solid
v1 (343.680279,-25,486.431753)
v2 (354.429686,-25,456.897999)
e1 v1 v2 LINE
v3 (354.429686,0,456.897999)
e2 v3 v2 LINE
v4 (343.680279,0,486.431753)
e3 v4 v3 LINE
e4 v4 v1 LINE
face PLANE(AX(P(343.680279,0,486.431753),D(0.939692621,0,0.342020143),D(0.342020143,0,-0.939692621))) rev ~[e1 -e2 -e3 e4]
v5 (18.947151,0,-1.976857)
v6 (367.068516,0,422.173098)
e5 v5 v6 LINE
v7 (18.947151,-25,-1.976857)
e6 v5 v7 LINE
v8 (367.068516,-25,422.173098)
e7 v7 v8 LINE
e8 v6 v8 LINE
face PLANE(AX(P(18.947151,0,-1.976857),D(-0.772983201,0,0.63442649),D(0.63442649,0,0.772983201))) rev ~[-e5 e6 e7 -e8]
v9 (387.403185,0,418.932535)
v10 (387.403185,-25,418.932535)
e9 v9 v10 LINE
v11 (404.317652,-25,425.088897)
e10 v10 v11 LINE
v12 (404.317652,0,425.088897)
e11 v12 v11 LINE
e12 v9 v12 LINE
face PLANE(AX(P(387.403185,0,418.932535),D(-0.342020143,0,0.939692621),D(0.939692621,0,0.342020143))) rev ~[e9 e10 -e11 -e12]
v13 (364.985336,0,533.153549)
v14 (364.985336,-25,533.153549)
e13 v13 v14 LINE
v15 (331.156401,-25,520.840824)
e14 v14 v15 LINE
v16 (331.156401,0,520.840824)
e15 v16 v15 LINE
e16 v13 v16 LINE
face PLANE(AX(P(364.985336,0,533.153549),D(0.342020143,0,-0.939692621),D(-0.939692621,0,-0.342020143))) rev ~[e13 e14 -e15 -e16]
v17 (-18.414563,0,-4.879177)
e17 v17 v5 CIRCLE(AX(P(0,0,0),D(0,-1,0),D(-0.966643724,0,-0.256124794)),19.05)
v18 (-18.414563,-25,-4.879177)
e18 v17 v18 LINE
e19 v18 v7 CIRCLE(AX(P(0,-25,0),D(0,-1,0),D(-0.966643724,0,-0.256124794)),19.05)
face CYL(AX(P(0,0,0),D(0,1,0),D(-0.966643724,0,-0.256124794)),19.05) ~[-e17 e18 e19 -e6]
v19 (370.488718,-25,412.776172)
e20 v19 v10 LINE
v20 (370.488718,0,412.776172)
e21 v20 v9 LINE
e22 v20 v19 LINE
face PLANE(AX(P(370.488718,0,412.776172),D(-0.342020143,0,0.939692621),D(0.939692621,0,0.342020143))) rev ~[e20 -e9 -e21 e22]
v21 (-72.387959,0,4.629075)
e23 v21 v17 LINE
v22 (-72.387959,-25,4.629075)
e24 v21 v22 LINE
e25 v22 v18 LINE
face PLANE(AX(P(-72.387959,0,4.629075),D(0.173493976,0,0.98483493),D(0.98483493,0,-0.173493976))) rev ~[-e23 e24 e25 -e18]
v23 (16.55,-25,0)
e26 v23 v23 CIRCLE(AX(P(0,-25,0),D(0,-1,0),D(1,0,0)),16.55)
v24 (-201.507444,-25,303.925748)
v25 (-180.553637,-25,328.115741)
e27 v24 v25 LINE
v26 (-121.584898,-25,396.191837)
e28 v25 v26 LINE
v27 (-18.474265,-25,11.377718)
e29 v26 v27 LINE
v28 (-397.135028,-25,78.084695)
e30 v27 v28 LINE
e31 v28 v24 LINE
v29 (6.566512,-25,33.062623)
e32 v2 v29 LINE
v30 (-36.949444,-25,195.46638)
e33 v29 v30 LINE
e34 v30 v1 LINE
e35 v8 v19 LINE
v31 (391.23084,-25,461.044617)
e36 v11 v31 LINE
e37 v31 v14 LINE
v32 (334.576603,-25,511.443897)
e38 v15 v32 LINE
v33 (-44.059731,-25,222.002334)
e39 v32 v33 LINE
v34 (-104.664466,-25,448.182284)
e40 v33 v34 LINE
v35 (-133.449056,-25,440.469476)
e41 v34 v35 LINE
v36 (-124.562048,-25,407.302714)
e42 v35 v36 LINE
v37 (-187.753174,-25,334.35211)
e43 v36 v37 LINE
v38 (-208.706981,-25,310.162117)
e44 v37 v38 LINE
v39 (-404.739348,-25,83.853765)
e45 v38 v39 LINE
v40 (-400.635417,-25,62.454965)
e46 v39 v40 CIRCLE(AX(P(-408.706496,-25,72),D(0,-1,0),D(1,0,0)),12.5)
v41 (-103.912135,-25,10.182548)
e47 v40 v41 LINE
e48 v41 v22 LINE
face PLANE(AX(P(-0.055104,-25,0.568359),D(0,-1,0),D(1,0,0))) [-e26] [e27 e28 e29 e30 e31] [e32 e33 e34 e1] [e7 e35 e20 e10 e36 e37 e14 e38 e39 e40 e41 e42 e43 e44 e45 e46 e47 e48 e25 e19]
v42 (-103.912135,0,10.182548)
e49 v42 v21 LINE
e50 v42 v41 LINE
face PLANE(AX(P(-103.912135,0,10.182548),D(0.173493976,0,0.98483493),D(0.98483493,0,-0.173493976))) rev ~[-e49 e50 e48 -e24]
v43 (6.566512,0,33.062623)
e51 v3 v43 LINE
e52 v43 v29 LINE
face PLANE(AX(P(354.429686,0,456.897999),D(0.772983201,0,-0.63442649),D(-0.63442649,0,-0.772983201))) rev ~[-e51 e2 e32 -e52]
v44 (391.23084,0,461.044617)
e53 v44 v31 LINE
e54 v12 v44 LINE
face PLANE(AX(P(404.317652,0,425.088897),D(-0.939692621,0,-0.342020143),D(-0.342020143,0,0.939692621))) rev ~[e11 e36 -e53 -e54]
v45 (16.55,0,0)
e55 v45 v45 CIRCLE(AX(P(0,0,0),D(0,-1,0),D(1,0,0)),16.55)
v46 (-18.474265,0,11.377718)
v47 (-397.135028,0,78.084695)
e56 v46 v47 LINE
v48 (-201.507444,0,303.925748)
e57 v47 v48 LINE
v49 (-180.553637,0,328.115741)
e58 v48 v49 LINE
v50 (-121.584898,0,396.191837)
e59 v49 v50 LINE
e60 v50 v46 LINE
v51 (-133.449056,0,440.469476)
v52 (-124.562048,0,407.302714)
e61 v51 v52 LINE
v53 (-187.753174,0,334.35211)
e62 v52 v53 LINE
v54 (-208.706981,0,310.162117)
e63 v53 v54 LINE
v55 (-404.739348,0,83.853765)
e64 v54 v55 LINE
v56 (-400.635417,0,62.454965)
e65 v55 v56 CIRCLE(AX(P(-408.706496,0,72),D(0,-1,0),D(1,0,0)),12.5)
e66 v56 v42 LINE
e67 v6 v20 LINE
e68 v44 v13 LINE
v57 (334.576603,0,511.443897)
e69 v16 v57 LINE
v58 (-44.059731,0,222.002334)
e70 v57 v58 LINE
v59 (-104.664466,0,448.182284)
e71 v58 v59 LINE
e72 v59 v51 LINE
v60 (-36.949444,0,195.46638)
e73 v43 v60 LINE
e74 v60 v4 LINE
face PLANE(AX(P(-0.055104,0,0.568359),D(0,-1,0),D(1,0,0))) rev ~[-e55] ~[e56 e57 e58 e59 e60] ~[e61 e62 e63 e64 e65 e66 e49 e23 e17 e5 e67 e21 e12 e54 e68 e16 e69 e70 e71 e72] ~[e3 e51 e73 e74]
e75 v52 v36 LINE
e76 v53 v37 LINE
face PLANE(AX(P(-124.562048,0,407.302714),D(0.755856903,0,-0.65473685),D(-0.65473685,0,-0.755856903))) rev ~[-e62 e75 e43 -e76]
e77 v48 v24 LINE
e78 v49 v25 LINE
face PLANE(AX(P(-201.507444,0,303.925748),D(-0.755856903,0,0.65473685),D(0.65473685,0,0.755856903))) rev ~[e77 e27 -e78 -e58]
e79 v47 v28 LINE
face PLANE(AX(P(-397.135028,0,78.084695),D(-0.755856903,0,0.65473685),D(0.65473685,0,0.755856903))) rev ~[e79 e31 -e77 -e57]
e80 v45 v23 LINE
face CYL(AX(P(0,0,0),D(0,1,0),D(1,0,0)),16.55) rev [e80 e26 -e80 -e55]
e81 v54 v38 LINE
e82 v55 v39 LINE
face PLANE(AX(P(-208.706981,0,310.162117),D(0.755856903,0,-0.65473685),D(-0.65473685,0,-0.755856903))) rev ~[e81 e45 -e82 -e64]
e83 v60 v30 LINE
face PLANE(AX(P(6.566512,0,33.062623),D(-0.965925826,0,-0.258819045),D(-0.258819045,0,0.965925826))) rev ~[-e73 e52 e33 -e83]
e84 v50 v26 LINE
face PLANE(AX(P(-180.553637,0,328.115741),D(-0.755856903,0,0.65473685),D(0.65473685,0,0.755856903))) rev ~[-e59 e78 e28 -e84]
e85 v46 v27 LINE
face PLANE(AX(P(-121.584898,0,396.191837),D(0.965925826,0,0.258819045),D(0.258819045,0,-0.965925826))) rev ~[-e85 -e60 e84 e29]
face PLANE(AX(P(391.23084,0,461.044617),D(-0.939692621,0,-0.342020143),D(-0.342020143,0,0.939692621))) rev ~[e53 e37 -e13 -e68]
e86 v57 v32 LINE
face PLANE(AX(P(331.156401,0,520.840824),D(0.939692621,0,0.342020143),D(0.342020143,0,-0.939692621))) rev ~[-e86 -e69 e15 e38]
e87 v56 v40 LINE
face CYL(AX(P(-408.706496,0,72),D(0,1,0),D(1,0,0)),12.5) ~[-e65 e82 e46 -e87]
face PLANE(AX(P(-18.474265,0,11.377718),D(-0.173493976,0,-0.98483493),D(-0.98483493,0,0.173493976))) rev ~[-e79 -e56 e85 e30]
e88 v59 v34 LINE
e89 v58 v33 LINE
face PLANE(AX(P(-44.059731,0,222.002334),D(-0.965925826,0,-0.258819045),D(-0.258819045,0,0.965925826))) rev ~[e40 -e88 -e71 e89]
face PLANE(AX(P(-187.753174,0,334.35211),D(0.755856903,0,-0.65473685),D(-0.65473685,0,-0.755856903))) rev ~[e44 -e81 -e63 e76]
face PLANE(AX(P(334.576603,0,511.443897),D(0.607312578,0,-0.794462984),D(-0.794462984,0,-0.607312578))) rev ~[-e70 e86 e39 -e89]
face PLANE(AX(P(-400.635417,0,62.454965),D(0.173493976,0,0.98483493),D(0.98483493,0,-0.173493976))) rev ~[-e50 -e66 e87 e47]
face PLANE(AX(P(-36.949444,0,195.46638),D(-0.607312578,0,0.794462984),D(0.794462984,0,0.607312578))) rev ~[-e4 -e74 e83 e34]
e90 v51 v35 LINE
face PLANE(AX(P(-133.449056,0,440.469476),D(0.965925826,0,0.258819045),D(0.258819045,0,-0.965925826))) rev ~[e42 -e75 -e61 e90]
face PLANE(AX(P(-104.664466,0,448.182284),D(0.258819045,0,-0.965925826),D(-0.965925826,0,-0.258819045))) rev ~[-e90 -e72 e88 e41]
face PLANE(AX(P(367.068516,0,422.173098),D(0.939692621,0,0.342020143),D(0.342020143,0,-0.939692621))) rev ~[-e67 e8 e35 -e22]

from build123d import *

# Parameters (mm, degrees)
F1_R     = 16.55
F0_DEPTH = 25


with BuildPart() as f0:
    # F1 (on Front) → F0 (new body)
    with BuildSketch(Plane.XZ):
        with BuildLine():
            ThreePointArc((18.9471511403, -1.9768570177), (19.0242704094, -0.9897653202), (19.05, 0))
            ThreePointArc((19.05, 0), (17.0081092666, 8.5806013294), (11.3201607165, 15.3217643028))
            ThreePointArc((11.3201607165, 15.3217643028), (3.1862146863, 18.7816542395), (-5.6337146577, 18.1979053508))
            ThreePointArc((-5.6337146577, 18.1979053508), (-12.7048225923, 14.1947167248), (-17.4644289069, 7.6089567588))
            ThreePointArc((-17.4644289069, 7.6089567588), (-18.9951016681, 1.4452033137), (-18.4145629505, -4.8791773224))
            ThreePointArc((-18.4145629505, -4.8791773224), (1.4753909085, -18.9927807776), (18.9471511403, -1.9768570177))
        make_face()
        Circle(F1_R, mode=Mode.SUBTRACT)
        with BuildLine():
            ThreePointArc((11.3201607165, 15.3217643028), (17.0081092666, 8.5806013294), (19.05, 0))
            ThreePointArc((19.05, 0), (19.0242704094, -0.9897653202), (18.9471511403, -1.9768570177))
            Line((18.9471511403, -1.9768570177), (367.068516355, 422.1730984288))
            Line((367.068516355, 422.1730984288), (358.5591705204, 445.5523339637))
            Line((358.5591705204, 445.5523339637), (354.4296862364, 456.8979987878))
            Line((354.4296862364, 456.8979987878), (197.6336692676, 265.8582343353))
            Line((197.6336692676, 265.8582343353), (68.718206586, 108.788047853))
            Line((68.718206586, 108.788047853), (6.5665120874, 33.0626225082))
            Line((6.5665120874, 33.0626225082), (11.3201607165, 15.3217643028))
        make_face()
        with BuildLine():
            ThreePointArc((-5.6337146577, 18.1979053508), (3.1862146863, 18.7816542395), (11.3201607165, 15.3217643028))
            Line((11.3201607165, 15.3217643028), (6.5665120874, 33.0626225082))
            Line((6.5665120874, 33.0626225082), (-36.9494436056, 195.4663800944))
            Line((-36.9494436056, 195.4663800944), (-44.0597309982, 222.0023338999))
            Line((-44.0597309982, 222.0023338999), (-104.6644659355, 448.182283865))
            Line((-104.6644659355, 448.182283865), (-133.4490555589, 440.4694763209))
            Line((-133.4490555589, 440.4694763209), (-124.5620482674, 407.302713582))
            Line((-124.5620482674, 407.302713582), (-121.5848978652, 396.1918370193))
            Line((-121.5848978652, 396.1918370193), (-18.4742653371, 11.3777176238))
            Line((-18.4742653371, 11.3777176238), (-17.4644289069, 7.6089567588))
            ThreePointArc((-17.4644289069, 7.6089567588), (-12.7048225923, 14.1947167248), (-5.6337146577, 18.1979053508))
        make_face()
        with BuildLine():
            Line((-72.3879589454, 4.6290750499), (-18.4145629505, -4.8791773224))
            ThreePointArc((-18.4145629505, -4.8791773224), (-18.9951016681, 1.4452033137), (-17.4644289069, 7.6089567588))
            Line((-17.4644289069, 7.6089567588), (-18.4742653371, 11.3777176238))
            Line((-18.4742653371, 11.3777176238), (-69.612055331, 20.3864339378))
            ThreePointArc((-69.612055331, 20.3864339378), (-70.9081149957, 12.4915662651), (-72.3879589454, 4.6290750499))
        make_face()
        Polygon((358.5591705204, 445.5523339637), (367.068516355, 422.1730984288), (370.4887177882, 412.7761722209), (387.4031849624, 418.9325348008), (404.3176521365, 425.0888973806), (391.2308402699, 461.0446174767), (364.9853356541, 533.153548771), (331.1564013058, 520.8408236113), (334.576602739, 511.4438974034), (343.6802788522, 486.4317528486), (354.4296862364, 456.8979987878), align=None)
        Polygon((-44.0597309982, 222.0023338999), (-36.9494436056, 195.4663800944), (128.9154626816, 322.2587492585), (343.6802788522, 486.4317528486), (334.576602739, 511.4438974034), align=None)
        with BuildLine():
            Line((-103.9121348451, 10.1825484742), (-72.3879589454, 4.6290750499))
            ThreePointArc((-72.3879589454, 4.6290750499), (-70.9081149957, 12.4915662651), (-69.612055331, 20.3864339378))
            Line((-69.612055331, 20.3864339378), (-101.1362312306, 25.9399073622))
            ThreePointArc((-101.1362312306, 25.9399073622), (-102.4228327716, 18.043373494), (-103.9121348451, 10.1825484742))
        make_face()
        with BuildLine():
            Line((-124.5620482674, 407.302713582), (-187.7531740158, 334.3521096451))
            ThreePointArc((-187.7531740158, 334.3521096451), (-184.1317567279, 331.2589177075), (-180.5536370153, 328.1157411523))
            Line((-180.5536370153, 328.1157411523), (-121.5848978652, 396.1918370193))
            Line((-121.5848978652, 396.1918370193), (-124.5620482674, 407.302713582))
        make_face()
        with BuildLine():
            ThreePointArc((-180.5536370153, 328.1157411523), (-184.1317567279, 331.2589177075), (-187.7531740158, 334.3521096451))
            Line((-187.7531740158, 334.3521096451), (-208.7069809814, 310.1621169077))
            ThreePointArc((-208.7069809814, 310.1621169077), (-205.0833359165, 307.0714968135), (-201.5074439809, 303.9257484149))
            Line((-201.5074439809, 303.9257484149), (-180.5536370153, 328.1157411523))
        make_face()
        with BuildLine():
            Line((-400.6354173431, 62.4549653328), (-103.9121348451, 10.1825484742))
            ThreePointArc((-103.9121348451, 10.1825484742), (-102.4228327716, 18.043373494), (-101.1362312306, 25.9399073622))
            Line((-101.1362312306, 25.9399073622), (-397.1350282031, 78.084694838))
            Line((-397.1350282031, 78.084694838), (-201.5074439809, 303.9257484149))
            ThreePointArc((-201.5074439809, 303.9257484149), (-205.0833359165, 307.0714968135), (-208.7069809814, 310.1621169077))
            Line((-208.7069809814, 310.1621169077), (-404.7393478146, 83.8537645513))
            ThreePointArc((-404.7393478146, 83.8537645513), (-398.5615625862, 79.3027613179), (-396.2064961559, 72))
            ThreePointArc((-396.2064961559, 72), (-397.3676583592, 66.7387494433), (-400.6354173431, 62.4549653328))
        make_face()
        with BuildLine():
            ThreePointArc((-404.7393478146, 83.8537645513), (-420.9827692162, 69.6456169071), (-400.6354173431, 62.4549653328))
            ThreePointArc((-400.6354173431, 62.4549653328), (-397.3676583592, 66.7387494433), (-396.2064961559, 72))
            ThreePointArc((-396.2064961559, 72), (-398.5615625862, 79.3027613179), (-404.7393478146, 83.8537645513))
        make_face()
    extrude(amount=F0_DEPTH)


solid = f0.part
